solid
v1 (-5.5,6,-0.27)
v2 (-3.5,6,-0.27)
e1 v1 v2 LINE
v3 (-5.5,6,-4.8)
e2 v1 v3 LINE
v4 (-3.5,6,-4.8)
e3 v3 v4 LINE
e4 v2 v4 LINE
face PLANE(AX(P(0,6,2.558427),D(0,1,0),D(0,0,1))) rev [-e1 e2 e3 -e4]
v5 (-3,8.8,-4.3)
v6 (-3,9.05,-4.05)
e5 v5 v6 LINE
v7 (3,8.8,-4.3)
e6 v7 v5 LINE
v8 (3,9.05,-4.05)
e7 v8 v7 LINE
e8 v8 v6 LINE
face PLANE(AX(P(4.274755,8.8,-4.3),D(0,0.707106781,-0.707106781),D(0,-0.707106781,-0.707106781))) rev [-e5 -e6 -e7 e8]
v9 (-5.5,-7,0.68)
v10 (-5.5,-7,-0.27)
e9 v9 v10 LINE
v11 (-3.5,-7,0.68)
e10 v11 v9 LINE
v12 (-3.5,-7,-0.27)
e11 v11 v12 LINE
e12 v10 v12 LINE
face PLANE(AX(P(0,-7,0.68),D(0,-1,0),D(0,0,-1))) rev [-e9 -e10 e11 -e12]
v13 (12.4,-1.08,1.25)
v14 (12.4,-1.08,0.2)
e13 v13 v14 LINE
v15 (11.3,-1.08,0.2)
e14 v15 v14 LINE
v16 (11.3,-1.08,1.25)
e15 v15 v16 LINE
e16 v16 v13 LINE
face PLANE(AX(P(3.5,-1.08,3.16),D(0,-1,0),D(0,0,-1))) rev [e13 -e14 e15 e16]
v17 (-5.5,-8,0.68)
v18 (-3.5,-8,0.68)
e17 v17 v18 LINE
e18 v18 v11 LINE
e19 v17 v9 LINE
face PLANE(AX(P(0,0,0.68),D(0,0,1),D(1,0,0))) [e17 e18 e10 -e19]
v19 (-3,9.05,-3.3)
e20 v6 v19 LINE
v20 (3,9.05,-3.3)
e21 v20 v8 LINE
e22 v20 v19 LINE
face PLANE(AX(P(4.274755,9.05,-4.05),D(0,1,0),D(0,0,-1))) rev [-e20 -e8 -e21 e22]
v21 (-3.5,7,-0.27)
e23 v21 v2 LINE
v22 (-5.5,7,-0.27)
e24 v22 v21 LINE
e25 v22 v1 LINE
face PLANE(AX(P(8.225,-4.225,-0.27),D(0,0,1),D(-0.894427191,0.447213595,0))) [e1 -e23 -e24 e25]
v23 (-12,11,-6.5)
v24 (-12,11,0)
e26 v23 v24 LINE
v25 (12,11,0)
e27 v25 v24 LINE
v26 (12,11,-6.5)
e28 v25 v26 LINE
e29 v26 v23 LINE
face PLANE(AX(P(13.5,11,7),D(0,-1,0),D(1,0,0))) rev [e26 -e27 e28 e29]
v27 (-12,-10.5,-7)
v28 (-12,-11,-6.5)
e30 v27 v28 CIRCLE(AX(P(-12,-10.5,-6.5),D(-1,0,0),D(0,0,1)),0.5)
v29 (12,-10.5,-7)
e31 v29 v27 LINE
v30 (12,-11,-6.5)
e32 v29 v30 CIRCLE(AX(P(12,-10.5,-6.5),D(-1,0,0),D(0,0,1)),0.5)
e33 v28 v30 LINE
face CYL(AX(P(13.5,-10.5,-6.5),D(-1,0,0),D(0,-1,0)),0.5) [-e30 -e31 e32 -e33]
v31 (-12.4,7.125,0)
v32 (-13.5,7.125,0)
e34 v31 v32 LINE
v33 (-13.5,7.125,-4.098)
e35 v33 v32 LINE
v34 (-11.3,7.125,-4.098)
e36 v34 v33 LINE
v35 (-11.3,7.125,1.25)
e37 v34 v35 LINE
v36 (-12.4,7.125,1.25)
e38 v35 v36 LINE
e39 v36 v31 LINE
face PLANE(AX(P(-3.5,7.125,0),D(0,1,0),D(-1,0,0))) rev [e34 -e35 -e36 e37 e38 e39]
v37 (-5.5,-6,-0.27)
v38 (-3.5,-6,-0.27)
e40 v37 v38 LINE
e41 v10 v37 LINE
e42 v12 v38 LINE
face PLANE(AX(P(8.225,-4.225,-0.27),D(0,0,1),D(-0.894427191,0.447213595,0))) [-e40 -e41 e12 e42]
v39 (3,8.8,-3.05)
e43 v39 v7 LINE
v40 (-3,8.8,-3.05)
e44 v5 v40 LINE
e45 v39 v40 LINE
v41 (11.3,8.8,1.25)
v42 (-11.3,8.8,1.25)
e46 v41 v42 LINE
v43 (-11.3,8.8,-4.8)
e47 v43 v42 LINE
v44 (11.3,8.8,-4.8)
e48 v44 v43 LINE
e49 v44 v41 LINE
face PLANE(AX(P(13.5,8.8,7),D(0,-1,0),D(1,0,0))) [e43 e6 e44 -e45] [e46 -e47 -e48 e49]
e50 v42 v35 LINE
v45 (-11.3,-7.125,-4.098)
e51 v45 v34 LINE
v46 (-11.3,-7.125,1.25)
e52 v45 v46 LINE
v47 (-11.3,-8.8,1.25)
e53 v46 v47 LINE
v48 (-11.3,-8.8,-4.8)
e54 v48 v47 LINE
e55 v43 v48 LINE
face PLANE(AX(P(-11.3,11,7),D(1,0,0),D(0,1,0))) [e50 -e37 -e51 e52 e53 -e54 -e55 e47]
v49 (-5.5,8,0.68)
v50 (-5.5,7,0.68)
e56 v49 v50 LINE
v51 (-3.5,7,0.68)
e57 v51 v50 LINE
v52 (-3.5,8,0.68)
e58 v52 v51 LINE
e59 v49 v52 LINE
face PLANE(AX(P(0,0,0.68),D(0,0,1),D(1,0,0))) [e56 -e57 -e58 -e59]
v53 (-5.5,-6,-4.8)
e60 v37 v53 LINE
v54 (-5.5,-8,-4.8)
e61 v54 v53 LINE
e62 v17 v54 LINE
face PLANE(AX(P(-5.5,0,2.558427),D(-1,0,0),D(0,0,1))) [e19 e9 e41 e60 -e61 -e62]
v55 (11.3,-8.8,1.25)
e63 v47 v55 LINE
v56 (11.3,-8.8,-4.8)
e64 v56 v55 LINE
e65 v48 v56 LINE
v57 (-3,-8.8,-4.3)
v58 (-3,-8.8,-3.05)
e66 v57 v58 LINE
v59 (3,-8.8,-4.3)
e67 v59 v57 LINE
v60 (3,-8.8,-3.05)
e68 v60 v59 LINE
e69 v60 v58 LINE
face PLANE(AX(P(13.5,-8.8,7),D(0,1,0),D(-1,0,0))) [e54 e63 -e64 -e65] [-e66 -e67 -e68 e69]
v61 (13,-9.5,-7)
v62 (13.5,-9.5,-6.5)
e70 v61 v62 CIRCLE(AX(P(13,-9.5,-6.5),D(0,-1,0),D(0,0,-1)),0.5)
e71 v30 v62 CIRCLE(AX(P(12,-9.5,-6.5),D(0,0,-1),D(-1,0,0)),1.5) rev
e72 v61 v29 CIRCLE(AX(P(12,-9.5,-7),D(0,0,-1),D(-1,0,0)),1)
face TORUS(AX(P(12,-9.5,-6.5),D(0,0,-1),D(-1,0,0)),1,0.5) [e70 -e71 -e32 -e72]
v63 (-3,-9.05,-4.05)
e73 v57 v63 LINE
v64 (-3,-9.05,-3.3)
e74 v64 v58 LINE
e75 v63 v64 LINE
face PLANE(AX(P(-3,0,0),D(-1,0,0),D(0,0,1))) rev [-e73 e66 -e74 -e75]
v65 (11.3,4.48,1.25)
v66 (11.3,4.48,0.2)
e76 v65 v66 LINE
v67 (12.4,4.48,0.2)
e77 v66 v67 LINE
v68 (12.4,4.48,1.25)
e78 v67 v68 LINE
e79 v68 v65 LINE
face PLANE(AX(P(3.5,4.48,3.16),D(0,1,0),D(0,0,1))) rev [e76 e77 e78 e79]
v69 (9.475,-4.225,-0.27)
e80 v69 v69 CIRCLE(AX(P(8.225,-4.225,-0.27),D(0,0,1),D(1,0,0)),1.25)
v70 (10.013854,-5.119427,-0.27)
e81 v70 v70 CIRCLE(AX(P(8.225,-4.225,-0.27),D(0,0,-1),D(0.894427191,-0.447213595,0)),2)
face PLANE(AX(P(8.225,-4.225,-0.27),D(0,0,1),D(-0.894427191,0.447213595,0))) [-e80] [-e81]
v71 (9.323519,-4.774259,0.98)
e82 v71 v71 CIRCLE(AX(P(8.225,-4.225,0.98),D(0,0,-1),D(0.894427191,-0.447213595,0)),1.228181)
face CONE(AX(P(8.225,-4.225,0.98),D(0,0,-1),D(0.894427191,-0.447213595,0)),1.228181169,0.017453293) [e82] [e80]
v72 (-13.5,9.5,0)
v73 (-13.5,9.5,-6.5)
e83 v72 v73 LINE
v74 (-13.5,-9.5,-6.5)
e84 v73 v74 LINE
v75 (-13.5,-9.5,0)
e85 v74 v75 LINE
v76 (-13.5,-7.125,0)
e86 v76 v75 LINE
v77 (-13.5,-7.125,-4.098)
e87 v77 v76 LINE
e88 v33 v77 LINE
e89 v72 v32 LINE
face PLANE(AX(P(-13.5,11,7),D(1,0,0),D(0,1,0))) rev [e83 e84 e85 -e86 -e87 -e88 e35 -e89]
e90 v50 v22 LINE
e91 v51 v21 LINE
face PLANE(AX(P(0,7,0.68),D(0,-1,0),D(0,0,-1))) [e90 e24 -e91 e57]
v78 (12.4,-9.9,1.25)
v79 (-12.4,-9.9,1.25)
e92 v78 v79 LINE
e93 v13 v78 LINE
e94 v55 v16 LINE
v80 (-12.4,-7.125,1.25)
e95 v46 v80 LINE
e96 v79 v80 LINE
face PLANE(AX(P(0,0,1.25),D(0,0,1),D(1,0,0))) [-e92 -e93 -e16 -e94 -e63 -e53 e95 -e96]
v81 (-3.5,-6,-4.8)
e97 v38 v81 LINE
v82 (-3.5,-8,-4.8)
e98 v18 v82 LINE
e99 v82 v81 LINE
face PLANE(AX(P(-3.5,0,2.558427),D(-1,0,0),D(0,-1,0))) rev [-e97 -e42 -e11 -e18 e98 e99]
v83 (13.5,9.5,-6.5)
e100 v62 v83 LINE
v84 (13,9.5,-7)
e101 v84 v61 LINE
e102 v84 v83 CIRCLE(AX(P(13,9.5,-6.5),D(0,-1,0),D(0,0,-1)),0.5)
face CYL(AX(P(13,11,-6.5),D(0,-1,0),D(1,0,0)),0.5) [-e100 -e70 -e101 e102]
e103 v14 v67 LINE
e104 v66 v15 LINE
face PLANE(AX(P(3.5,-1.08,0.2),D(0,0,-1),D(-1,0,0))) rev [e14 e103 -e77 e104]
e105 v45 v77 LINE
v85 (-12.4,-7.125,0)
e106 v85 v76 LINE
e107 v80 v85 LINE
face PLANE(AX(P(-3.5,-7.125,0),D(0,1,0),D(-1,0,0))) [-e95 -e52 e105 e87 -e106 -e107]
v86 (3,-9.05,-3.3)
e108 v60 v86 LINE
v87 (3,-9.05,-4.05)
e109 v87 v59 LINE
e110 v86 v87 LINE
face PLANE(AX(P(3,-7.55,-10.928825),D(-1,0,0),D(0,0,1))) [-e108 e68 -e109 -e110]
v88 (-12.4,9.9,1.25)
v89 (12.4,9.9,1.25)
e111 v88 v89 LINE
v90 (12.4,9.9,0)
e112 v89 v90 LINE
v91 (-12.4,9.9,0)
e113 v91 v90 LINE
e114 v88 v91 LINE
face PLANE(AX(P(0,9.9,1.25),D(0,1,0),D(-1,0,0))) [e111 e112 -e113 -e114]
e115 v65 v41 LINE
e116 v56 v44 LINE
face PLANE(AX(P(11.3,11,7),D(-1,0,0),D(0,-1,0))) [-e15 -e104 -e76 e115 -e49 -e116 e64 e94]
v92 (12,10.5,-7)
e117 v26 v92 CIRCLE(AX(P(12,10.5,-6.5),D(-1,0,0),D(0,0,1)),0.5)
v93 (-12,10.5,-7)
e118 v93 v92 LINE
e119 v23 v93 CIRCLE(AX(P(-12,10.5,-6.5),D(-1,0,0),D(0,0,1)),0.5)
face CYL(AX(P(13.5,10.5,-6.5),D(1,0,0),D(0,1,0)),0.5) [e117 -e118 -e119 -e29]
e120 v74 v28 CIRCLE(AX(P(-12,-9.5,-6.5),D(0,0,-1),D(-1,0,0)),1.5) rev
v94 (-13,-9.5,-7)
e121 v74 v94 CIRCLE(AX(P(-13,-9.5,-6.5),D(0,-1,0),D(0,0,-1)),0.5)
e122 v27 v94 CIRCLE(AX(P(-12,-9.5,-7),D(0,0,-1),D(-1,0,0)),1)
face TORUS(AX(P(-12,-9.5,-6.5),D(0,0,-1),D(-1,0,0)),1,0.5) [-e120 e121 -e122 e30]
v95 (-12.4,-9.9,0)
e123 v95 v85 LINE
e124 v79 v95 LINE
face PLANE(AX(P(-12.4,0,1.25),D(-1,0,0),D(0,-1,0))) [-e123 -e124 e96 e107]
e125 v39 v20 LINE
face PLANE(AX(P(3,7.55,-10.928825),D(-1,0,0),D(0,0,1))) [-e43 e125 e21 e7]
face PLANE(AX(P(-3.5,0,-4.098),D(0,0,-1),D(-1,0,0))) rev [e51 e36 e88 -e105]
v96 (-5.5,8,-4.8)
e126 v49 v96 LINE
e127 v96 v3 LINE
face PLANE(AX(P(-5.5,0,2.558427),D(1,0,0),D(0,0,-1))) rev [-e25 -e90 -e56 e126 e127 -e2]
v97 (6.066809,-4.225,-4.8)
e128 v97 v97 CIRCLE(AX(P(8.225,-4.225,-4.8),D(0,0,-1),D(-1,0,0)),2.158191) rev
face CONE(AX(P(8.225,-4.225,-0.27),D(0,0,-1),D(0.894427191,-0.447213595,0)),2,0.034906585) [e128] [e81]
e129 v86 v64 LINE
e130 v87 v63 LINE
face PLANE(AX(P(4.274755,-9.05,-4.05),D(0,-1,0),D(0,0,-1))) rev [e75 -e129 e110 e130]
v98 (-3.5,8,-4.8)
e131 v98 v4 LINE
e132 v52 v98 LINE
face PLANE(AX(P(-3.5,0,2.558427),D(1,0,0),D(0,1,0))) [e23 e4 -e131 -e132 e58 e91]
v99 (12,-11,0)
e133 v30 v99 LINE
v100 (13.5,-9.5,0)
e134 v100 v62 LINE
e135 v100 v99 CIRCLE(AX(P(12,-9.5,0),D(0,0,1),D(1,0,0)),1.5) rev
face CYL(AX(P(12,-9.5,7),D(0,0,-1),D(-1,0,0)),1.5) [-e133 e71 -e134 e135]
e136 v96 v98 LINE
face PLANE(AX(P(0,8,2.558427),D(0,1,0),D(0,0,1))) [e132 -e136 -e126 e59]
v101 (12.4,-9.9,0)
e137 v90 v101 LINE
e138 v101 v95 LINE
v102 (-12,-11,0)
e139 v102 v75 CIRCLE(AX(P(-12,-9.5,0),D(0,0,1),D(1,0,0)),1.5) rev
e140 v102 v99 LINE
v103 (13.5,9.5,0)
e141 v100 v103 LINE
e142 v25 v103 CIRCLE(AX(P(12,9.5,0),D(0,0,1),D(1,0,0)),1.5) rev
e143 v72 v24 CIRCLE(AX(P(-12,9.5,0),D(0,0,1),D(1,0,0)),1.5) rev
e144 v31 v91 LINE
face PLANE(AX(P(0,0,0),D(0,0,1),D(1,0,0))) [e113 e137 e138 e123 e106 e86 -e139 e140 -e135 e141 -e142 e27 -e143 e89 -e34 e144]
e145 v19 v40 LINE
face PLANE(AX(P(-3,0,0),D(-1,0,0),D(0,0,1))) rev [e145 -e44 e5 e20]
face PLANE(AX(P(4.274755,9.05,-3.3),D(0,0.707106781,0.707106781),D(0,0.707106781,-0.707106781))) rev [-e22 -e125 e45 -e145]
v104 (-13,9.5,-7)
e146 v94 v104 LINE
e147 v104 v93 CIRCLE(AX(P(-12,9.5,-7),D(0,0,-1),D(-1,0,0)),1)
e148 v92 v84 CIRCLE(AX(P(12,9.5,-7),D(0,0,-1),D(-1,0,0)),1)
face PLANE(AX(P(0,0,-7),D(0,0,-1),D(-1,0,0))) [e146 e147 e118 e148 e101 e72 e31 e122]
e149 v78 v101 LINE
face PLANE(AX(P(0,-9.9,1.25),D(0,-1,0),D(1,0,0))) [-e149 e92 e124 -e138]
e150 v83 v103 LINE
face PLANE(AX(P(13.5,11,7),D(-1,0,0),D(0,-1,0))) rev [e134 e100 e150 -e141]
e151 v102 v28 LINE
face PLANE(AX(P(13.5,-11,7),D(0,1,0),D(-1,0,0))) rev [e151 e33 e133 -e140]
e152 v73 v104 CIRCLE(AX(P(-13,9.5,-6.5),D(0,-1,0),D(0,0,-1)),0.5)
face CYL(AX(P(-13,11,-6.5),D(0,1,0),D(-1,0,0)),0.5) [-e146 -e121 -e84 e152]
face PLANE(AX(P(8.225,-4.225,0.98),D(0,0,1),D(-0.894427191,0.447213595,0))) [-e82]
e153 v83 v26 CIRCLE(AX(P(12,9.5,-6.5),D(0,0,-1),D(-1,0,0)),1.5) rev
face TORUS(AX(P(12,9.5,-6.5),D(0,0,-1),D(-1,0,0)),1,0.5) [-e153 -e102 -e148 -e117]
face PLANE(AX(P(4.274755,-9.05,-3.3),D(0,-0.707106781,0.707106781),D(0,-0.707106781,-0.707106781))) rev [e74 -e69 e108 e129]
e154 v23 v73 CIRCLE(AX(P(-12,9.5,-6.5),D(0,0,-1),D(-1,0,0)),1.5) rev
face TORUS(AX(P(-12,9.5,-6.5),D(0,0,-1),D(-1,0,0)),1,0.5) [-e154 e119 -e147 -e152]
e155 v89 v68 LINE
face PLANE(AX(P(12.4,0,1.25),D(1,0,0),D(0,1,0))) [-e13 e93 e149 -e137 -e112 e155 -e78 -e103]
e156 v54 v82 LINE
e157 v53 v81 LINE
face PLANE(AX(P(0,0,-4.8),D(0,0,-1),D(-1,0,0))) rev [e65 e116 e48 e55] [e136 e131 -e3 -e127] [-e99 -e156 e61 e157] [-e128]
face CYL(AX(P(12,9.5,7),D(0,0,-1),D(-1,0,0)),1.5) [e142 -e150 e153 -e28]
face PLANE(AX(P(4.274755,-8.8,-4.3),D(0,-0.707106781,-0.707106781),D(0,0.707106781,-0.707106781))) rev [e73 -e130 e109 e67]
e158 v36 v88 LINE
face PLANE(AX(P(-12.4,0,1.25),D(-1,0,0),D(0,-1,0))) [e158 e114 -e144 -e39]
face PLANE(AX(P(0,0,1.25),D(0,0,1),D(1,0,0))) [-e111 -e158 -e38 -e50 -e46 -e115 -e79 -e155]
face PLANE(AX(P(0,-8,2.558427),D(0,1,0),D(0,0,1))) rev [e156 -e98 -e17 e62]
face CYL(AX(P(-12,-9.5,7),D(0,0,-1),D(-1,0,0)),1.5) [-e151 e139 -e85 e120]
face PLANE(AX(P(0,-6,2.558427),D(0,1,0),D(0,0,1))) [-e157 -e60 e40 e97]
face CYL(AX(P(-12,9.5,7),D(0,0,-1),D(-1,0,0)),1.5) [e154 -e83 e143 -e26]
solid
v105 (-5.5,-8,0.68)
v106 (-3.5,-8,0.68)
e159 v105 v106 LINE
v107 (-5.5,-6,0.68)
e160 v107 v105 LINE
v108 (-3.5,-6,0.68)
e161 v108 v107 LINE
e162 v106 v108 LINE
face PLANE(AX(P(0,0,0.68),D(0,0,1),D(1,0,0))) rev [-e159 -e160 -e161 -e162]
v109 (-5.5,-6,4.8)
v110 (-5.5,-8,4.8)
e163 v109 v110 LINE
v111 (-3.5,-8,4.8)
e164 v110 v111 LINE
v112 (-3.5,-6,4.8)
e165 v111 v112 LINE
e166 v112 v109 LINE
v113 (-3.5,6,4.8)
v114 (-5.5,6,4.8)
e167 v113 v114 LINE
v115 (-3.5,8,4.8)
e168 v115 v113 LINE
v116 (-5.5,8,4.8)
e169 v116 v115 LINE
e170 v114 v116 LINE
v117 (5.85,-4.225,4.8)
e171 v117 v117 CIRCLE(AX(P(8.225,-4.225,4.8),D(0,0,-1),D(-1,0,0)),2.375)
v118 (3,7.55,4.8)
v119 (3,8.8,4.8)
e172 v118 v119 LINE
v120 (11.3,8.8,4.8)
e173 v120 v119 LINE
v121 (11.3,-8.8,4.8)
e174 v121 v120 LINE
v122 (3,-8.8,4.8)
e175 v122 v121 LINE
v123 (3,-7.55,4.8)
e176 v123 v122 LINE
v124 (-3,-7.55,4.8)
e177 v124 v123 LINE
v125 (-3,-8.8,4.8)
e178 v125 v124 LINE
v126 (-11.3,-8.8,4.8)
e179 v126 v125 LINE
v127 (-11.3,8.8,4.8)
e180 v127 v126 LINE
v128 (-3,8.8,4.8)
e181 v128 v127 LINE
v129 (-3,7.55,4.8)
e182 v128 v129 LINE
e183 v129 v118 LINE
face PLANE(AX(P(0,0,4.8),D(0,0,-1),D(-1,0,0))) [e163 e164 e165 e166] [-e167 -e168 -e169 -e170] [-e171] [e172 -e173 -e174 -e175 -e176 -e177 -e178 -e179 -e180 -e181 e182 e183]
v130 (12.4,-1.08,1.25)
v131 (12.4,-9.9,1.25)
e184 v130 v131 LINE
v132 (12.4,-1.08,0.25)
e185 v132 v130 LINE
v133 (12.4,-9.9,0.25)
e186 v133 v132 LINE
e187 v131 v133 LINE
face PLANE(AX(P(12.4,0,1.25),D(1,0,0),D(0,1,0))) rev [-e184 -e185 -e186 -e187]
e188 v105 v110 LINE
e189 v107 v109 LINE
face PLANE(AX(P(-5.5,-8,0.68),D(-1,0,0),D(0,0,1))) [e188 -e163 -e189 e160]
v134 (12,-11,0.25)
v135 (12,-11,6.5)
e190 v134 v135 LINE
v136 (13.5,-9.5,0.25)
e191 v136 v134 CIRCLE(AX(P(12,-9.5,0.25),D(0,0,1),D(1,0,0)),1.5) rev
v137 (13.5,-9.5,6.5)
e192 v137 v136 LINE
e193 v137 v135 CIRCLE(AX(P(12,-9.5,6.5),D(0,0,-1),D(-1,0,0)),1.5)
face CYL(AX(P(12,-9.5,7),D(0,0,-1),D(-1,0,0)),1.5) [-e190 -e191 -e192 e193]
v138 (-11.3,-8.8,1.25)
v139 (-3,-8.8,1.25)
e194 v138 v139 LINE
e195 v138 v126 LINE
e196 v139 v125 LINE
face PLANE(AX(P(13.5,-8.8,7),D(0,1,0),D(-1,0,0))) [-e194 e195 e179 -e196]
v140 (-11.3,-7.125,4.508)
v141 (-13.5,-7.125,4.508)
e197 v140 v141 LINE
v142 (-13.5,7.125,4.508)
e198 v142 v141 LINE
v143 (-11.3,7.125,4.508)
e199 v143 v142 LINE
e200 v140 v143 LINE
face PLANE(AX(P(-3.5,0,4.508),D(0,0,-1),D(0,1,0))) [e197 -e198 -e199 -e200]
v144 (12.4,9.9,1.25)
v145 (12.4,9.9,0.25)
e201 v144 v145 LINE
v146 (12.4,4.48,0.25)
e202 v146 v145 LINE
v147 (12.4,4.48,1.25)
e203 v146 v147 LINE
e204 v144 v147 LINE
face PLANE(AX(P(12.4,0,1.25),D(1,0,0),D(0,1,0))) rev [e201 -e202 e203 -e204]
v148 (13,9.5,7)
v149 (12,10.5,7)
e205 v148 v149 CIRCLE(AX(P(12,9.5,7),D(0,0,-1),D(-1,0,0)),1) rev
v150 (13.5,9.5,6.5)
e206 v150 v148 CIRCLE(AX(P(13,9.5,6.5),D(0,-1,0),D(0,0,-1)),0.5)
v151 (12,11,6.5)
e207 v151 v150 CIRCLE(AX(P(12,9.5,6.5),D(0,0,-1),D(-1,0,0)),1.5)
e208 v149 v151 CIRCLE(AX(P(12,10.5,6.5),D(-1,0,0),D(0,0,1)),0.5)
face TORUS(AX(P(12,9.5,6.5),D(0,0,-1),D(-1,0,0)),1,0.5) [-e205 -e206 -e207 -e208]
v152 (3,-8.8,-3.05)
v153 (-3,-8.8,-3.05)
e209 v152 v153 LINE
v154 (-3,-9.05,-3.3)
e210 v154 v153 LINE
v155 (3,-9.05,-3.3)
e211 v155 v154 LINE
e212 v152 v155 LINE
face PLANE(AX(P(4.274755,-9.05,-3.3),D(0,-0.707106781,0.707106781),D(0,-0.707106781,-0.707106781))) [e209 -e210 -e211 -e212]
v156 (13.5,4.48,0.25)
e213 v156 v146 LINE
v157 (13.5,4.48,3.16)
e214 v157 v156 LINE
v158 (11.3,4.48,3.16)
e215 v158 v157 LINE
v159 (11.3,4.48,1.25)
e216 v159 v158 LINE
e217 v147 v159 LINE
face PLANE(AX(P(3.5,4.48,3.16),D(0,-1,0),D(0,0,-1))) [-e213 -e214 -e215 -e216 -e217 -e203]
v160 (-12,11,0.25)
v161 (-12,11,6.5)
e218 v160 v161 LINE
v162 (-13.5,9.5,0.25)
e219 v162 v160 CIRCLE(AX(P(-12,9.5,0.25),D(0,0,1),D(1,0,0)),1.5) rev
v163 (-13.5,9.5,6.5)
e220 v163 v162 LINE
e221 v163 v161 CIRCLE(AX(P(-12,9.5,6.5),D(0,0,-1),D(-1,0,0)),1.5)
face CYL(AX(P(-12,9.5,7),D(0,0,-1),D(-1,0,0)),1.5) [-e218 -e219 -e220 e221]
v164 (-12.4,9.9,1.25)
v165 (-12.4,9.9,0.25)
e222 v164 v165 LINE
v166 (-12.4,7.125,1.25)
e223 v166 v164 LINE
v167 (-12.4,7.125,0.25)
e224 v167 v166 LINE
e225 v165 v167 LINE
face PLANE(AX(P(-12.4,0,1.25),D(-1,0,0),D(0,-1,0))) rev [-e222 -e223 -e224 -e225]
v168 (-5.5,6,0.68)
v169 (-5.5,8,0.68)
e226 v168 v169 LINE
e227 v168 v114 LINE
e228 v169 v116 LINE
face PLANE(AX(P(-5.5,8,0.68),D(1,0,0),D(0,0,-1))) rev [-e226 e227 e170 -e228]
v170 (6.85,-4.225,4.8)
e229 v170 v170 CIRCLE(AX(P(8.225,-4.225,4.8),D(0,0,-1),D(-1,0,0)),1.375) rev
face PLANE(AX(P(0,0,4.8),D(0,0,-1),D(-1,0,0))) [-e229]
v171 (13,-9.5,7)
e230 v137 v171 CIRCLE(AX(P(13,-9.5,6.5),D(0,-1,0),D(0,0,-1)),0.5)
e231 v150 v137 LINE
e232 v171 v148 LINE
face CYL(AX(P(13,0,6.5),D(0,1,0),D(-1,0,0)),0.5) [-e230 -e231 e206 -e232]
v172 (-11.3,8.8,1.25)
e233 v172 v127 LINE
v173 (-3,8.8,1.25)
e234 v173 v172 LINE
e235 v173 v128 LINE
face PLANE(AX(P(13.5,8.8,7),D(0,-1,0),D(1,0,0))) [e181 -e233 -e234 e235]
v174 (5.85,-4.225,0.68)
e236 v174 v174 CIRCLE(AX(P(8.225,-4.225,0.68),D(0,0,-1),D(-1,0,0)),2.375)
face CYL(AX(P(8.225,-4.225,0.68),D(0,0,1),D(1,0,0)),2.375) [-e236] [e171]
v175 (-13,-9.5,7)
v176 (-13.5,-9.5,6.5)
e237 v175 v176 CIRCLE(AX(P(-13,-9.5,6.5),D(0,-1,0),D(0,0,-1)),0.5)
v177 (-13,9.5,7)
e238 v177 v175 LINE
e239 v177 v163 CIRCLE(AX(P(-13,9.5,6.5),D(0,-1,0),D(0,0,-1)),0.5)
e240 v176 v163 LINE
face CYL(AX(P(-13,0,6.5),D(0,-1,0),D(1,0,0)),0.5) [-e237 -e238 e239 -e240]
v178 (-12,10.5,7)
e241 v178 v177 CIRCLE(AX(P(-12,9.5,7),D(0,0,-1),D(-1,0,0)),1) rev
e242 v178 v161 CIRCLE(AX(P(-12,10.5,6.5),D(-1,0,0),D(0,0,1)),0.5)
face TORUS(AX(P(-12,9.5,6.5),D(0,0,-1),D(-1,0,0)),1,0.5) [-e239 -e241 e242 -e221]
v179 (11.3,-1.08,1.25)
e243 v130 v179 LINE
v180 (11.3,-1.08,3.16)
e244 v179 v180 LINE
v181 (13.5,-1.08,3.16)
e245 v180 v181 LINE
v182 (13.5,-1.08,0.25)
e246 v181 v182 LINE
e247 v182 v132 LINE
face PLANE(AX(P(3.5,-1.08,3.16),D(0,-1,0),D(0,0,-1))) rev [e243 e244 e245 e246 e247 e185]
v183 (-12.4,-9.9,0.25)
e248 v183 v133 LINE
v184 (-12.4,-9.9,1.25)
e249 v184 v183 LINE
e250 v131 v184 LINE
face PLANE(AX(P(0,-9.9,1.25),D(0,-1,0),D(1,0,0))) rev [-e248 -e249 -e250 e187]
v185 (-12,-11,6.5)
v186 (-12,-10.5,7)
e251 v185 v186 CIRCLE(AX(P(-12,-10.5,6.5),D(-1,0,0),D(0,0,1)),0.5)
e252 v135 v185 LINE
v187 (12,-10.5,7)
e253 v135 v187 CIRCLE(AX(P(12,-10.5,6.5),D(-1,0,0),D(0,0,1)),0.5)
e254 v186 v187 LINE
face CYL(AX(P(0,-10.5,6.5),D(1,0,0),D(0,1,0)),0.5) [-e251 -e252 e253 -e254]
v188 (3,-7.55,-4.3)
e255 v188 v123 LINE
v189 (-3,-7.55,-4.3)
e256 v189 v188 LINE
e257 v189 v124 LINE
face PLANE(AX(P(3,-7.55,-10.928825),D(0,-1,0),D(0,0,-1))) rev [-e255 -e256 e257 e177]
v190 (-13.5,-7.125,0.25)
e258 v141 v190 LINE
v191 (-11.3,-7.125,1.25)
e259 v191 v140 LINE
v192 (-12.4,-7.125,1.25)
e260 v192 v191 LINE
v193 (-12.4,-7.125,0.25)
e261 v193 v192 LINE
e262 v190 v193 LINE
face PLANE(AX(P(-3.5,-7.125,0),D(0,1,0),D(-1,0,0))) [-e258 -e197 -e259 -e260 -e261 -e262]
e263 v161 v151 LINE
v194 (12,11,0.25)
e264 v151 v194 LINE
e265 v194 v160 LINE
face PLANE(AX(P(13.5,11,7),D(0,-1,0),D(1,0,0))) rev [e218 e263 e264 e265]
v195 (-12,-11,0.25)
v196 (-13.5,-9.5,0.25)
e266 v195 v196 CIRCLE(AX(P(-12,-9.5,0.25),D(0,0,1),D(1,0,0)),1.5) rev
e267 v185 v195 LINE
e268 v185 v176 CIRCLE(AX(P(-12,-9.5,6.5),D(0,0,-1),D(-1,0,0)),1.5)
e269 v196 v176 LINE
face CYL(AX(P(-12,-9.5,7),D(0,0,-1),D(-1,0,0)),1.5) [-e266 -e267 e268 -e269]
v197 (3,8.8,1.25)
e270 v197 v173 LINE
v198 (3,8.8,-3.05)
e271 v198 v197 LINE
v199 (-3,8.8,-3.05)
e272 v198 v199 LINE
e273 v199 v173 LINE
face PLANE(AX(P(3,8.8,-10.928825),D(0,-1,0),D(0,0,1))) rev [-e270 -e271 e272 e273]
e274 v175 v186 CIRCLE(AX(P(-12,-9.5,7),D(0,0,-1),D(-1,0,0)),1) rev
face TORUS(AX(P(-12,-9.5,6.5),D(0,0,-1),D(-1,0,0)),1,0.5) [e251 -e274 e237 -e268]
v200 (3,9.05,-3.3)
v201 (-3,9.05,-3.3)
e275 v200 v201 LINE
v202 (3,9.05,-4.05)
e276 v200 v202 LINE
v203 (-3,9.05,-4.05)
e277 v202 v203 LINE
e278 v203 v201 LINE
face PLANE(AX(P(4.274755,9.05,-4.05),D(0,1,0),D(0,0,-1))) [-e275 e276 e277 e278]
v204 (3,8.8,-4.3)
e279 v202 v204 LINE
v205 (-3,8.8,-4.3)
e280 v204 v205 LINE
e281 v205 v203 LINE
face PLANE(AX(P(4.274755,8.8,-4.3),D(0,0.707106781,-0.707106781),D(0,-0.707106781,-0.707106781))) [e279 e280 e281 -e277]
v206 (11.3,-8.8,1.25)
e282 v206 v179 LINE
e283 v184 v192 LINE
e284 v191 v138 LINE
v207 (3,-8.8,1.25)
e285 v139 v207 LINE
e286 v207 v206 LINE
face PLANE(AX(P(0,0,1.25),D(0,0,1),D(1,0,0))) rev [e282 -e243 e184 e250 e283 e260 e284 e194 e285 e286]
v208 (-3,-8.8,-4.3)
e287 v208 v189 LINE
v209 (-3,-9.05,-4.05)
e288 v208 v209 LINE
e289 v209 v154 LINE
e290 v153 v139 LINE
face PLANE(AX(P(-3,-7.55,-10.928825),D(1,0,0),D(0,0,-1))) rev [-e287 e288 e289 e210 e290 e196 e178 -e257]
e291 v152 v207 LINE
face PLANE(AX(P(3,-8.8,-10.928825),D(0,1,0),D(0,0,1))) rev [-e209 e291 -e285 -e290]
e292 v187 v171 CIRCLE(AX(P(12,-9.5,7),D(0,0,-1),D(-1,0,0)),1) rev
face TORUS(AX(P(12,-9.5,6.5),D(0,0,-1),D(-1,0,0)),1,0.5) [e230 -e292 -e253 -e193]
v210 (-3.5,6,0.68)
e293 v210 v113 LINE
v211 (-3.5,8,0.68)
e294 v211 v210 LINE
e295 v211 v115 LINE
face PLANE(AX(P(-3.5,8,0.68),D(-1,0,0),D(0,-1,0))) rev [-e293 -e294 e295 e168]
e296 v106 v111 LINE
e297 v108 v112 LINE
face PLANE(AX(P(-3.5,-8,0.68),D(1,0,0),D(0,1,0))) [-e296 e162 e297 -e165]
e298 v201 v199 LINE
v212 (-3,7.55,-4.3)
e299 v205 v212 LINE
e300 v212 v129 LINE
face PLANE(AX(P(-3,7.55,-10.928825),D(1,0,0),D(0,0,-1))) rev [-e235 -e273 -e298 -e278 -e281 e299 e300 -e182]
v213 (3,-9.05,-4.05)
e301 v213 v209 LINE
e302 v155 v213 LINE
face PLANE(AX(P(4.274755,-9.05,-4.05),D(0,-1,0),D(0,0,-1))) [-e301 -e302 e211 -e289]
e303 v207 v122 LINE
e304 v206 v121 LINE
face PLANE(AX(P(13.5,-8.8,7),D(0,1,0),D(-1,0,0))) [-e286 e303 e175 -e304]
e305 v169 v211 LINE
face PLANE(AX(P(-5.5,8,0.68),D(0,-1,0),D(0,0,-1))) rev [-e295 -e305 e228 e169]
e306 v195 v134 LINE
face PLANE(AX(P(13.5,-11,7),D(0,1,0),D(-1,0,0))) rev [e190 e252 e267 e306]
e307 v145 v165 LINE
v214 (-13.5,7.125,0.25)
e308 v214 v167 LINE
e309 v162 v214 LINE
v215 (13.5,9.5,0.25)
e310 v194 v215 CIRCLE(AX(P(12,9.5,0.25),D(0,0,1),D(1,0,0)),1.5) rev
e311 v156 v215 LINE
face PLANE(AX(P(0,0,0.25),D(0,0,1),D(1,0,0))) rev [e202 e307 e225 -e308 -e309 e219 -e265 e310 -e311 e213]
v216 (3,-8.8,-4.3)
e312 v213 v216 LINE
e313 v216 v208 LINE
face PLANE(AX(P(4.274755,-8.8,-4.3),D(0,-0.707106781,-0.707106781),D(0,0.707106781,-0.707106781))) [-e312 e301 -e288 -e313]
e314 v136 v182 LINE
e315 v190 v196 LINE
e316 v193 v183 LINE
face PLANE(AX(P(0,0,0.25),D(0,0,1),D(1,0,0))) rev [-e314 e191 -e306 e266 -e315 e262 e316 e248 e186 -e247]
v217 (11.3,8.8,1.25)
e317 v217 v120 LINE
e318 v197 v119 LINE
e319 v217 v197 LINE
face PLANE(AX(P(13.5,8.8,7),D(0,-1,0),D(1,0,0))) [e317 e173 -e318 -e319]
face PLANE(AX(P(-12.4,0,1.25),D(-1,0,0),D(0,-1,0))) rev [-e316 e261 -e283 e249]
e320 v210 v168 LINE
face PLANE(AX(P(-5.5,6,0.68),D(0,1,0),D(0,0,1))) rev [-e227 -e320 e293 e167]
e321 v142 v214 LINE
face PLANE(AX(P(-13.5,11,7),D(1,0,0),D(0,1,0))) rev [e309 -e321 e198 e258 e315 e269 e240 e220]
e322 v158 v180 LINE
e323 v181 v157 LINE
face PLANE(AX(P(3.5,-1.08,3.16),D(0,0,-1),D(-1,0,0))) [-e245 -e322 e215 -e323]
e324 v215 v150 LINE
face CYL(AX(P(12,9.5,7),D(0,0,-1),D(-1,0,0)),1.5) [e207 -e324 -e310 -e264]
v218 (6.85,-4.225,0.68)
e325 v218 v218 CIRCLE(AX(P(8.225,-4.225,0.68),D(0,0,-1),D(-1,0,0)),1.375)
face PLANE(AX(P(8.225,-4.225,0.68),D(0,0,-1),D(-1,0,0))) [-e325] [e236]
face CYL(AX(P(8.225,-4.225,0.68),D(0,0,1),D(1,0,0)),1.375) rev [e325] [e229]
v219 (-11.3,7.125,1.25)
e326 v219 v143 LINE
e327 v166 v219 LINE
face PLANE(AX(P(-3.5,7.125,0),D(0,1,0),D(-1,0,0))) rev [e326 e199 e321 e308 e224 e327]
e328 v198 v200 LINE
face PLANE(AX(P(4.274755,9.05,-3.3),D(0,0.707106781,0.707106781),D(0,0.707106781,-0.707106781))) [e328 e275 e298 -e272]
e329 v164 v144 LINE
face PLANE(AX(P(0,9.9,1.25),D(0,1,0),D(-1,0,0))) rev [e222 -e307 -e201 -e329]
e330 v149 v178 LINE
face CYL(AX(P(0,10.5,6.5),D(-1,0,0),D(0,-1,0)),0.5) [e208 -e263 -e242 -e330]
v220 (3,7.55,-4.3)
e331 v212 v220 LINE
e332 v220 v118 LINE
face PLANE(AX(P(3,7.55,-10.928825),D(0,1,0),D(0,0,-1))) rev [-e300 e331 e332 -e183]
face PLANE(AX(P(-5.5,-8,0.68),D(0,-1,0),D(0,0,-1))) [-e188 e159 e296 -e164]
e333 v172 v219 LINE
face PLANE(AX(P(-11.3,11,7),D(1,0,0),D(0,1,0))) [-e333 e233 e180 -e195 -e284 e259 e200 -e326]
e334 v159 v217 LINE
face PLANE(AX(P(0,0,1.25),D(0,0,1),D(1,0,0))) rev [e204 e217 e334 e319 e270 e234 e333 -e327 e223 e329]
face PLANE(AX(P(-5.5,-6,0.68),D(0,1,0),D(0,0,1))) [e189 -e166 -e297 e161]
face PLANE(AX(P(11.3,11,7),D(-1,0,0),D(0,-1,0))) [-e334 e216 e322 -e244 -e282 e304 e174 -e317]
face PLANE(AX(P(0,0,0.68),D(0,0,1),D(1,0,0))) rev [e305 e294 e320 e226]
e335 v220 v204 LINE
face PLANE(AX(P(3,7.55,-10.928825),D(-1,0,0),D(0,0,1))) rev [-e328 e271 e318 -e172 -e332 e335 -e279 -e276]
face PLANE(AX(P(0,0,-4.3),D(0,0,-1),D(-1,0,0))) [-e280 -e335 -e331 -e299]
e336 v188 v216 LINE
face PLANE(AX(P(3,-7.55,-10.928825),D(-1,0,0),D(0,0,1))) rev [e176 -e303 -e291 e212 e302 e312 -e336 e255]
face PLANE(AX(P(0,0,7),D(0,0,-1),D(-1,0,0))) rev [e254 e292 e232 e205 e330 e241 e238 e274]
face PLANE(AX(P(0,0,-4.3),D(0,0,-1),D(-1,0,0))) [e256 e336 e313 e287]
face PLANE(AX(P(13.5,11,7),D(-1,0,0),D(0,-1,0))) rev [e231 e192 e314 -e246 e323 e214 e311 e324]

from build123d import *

# Parameters (mm, degrees)
SKETCH1_W                   = 27
SKETCH1_H                   = 22
BOSS_EXTRUDE1_DEPTH         = 7
FILLET1_R                   = 1.5
SHELL1_T                    = 2.2
SKETCH4_W                   = 8.606
SKETCH4_H                   = 14.25
CUT_EXTRUDE1_DEPTH          = 10
SKETCH3_W                   = 2.96
SKETCH3_H                   = 5.56
CUT_EXTRUDE2_DEPTH          = 10
FILLET2_R                   = 0.5
FILLET3_R                   = 0.5
SKETCH5_W                   = 2
SKETCH5_H                   = 1
BOSS_EXTRUDE2_DEPTH         = 4.53
SKETCH5_3_W                 = 2
SKETCH5_3_H                 = 1
BOSS_EXTRUDE3_DEPTH         = 5.48
SKETCH6_W                   = 2
SKETCH6_H                   = 2
BOSS_EXTRUDE4_DEPTH         = 4.12
LIP_GROOVE2_GROOVE_DEPTH    = 1.25
LIP_GROOVE2_GROOVE_2_DEPTH  = 0.25
LIP_GROOVE2_LIP_START       = -12.4
LIP_GROOVE2_LIP_OUTLINE_W   = 1.1
LIP_GROOVE2_LIP_OUTLINE_H   = 1.25
LIP_GROOVE2_LIP_DEPTH       = 24.8
LIP_GROOVE2_LIP_START_2     = 11.3
LIP_GROOVE2_LIP_2_OUTLINE_W = 17.6
LIP_GROOVE2_LIP_2_OUTLINE_H = 1.25
LIP_GROOVE2_LIP_2_DEPTH     = 1.1
LIP_GROOVE2_LIP_3_OUTLINE_W = 1.675
LIP_GROOVE2_LIP_3_OUTLINE_H = 1.25
LIP_GROOVE2_LIP_3_DEPTH     = 1.1
SKETCH11_W                  = 6
SKETCH11_H                  = 1.25
BOSS_EXTRUDE5_DEPTH         = 9.1
BOSS_EXTRUDE6_DEPTH         = 6
CUT_EXTRUDE3_START          = -3
CUT_EXTRUDE3_DEPTH          = 6
SKETCH3_3_W                 = 2.96
SKETCH3_3_H                 = 5.56
CUT_EXTRUDE4_DEPTH          = 10
SKETCH14_R                  = 2.375
SKETCH14_R_2                = 1.375
BOSS_EXTRUDE7_DEPTH         = 4.12


# Read off the part's stored shape, not the designer's step: Mounting Boss1, Lip&Groove2-Groove, Lip&Groove2-Lip, Cut-Extrude3
with BuildPart() as part:
    # Sketch1 → Boss-Extrude1 (new, symmetric)
    with BuildSketch(Plane.XY):
        Rectangle(SKETCH1_W, SKETCH1_H)
    extrude(amount=BOSS_EXTRUDE1_DEPTH, both=True)

    # Fillet1
    fillet1_edges = [part.edges().sort_by_distance(p)[0] for p in [
        (-13.5, 11, 0),
        (13.5, 11, 0),
        (13.5, -11, 0),
        (-13.5, -11, 0),
    ]]
    fillet(fillet1_edges, radius=FILLET1_R)

    # Shell1 (no face opened: a closed hollow body)
    add(offset(amount=-SHELL1_T, mode=Mode.PRIVATE), mode=Mode.SUBTRACT)


with BuildPart() as body_2:
    # Split1: the piece on the far side of the plane
    add(part.part)
    split(bisect_by=Plane.XY, keep=Keep.BOTTOM)

    # Mounting Boss1 outline → Mounting Boss1 (revolve)
    with BuildSketch(Plane(origin=(8.225, -4.225, 0), x_dir=(1, 0, 0), z_dir=(0, -1, 0))):
        Polygon((2, -0.27), (1.25, -0.27), (1.228181169, 0.98), (0, 0.98), (0, -4.8), (2.158191086, -4.8), align=None)
    revolve(axis=Axis((8.225, -4.225, 0), (0, 0, 1)))


with BuildPart() as part_1:
    add(part.part)

    # Split1
    split(bisect_by=Plane.XY, keep=Keep.TOP)


with BuildPart() as cut_extrude1_tool:
    # Sketch4 → Cut-Extrude1 (new body)
    with BuildSketch(Plane.ZY.offset(13.5)):
        with Locations((0.205, 0)):
            Rectangle(SKETCH4_W, SKETCH4_H)
    extrude(amount=-CUT_EXTRUDE1_DEPTH)


with BuildPart() as part_2:
    add(part_1.part)

    # Cut-Extrude1: cut by cut_extrude1_tool
    add(cut_extrude1_tool.part, mode=Mode.SUBTRACT)

    # Sketch3 → Cut-Extrude2 (cut)
    with BuildSketch(Plane(origin=(13.5, 0, 0), x_dir=(0, 0, -1), z_dir=(1, 0, 0))):
        with Locations((-1.68, 1.7)):
            Rectangle(SKETCH3_W, SKETCH3_H)
    extrude(amount=-CUT_EXTRUDE2_DEPTH, mode=Mode.SUBTRACT)

    # Fillet2
    fillet2_edges = [part_2.edges().sort_by_distance(p)[0] for p in [
        (-13.5, 0, 7),
        (0, 11, 7),
        (0, -11, 7),
        (13.5, 0, 7),
        (-13.060660172, -10.560660172, 7),
        (13.060660172, -10.560660172, 7),
        (13.060660172, 10.560660172, 7),
        (-13.060660172, 10.560660172, 7),
    ]]
    fillet(fillet2_edges, radius=FILLET2_R)

    # Sketch6 → Boss-Extrude4 (add)
    with BuildSketch(Plane(origin=(0, 0, 4.8), x_dir=(-1, 0, 0), z_dir=(0, 0, -1))):
        with Locations((4.5, 7)):
            Rectangle(SKETCH6_W, SKETCH6_H)
    boss_extrude4 = extrude(amount=BOSS_EXTRUDE4_DEPTH)

    # Mirror3: Boss-Extrude4 across plane
    add(boss_extrude4.mirror(Plane.ZX))

    # Lip&Groove2-Groove outline → Lip&Groove2-Groove (cut)
    with BuildSketch(Plane.XY):
        Polygon((-12.4, -9.9), (12.4, -9.9), (12.4, -1.08), (13.5, -1.08), (13.5, 4.48), (12.4, 4.48), (12.4, 9.9), (-12.4, 9.9), (-12.4, 7.125), (-11.3, 7.125), (-11.3, 8.8), (11.3, 8.8), (11.3, -8.8), (-11.3, -8.8), (-11.3, -7.125), (-12.4, -7.125), align=None)
    extrude(amount=LIP_GROOVE2_GROOVE_DEPTH, mode=Mode.SUBTRACT)

    # Lip_Groove2-Groove 2 outline → Lip_Groove2-Groove 2 (cut)
    with BuildSketch(Plane.XY):
        with BuildLine():
            Line((12.4, -1.08), (12.4, -9.9))
            Line((12.4, -9.9), (-12.4, -9.9))
            Line((-12.4, -9.9), (-12.4, -7.125))
            Line((-12.4, -7.125), (-13.5, -7.125))
            Line((-13.5, -7.125), (-13.5, -9.5))
            ThreePointArc((-13.5, -9.5), (-13.060660172, -10.560660172), (-12, -11))
            Line((-12, -11), (12, -11))
            ThreePointArc((12, -11), (13.060660172, -10.560660172), (13.5, -9.5))
            Line((13.5, -9.5), (13.5, -1.08))
            Line((13.5, -1.08), (12.4, -1.08))
        make_face()
        with BuildLine():
            Line((12.4, 4.48), (13.5, 4.48))
            Line((13.5, 4.48), (13.5, 9.5))
            ThreePointArc((13.5, 9.5), (13.060660172, 10.560660172), (12, 11))
            Line((12, 11), (-12, 11))
            ThreePointArc((-12, 11), (-13.060660172, 10.560660172), (-13.5, 9.5))
            Line((-13.5, 9.5), (-13.5, 7.125))
            Line((-13.5, 7.125), (-12.4, 7.125))
            Line((-12.4, 7.125), (-12.4, 9.9))
            Line((-12.4, 9.9), (12.4, 9.9))
            Line((12.4, 9.9), (12.4, 4.48))
        make_face()
    extrude(amount=LIP_GROOVE2_GROOVE_2_DEPTH, mode=Mode.SUBTRACT)

    # Sketch11 → Boss-Extrude5 (add)
    with BuildSketch(Plane(origin=(0, 0, 4.8), x_dir=(-1, 0, 0), z_dir=(0, 0, -1))):
        with Locations((0, -8.175)):
            Rectangle(SKETCH11_W, SKETCH11_H)
    boss_extrude5 = extrude(amount=BOSS_EXTRUDE5_DEPTH)

    # Sketch12 → Boss-Extrude6 (add)
    with BuildSketch(Plane.ZY.offset(3)):
        Polygon((-4.3, -8.8), (-4.05, -9.05), (-3.3, -9.05), (-3.05, -8.8), align=None)
    boss_extrude6 = extrude(amount=-BOSS_EXTRUDE6_DEPTH)

    # Mirror5: Boss-Extrude5, Boss-Extrude6 across plane
    add(boss_extrude5.mirror(Plane.ZX))
    add(boss_extrude6.mirror(Plane.ZX))

    # Sketch14 → Boss-Extrude7 (add)
    with BuildSketch(Plane(origin=(0, 0, 4.8), x_dir=(-1, 0, 0), z_dir=(0, 0, -1))):
        with Locations((-8.225, -4.225)):
            Circle(SKETCH14_R)
        with Locations((-8.225, -4.225)):
            Circle(SKETCH14_R_2, mode=Mode.SUBTRACT)
    extrude(amount=BOSS_EXTRUDE7_DEPTH)


with BuildPart() as body_2_1:
    add(body_2.part)

    # Cut-Extrude1: cut by cut_extrude1_tool
    add(cut_extrude1_tool.part, mode=Mode.SUBTRACT)

    # Fillet3
    fillet3_edges = [body_2_1.edges().sort_by_distance(p)[0] for p in [
        (-13.5, 0, -7),
        (0, -11, -7),
        (13.5, 0, -7),
        (0, 11, -7),
        (-13.060660172, -10.560660172, -7),
        (13.060660172, -10.560660172, -7),
        (13.060660172, 10.560660172, -7),
        (-13.060660172, 10.560660172, -7),
    ]]
    fillet(fillet3_edges, radius=FILLET3_R)

    # Sketch5 → Boss-Extrude2 (add)
    with BuildSketch(Plane.XY.offset(-4.8)):
        with Locations((-4.5, 7.5)):
            Rectangle(SKETCH5_W, SKETCH5_H)
        with Locations((-4.5, 6.5)):
            Rectangle(SKETCH5_W, SKETCH5_H)
    boss_extrude2 = extrude(amount=BOSS_EXTRUDE2_DEPTH)

    # Sketch5<3> → Boss-Extrude3 (add)
    with BuildSketch(Plane.XY.offset(-4.8)):
        with Locations((-4.5, 7.5)):
            Rectangle(SKETCH5_3_W, SKETCH5_3_H)
    boss_extrude3 = extrude(amount=BOSS_EXTRUDE3_DEPTH)

    # Mirror2: Boss-Extrude2, Boss-Extrude3 across plane
    add(boss_extrude2.mirror(Plane.ZX))
    add(boss_extrude3.mirror(Plane.ZX))

    # Lip&Groove2-Lip outline → Lip&Groove2-Lip (add)
    with BuildSketch(Plane.YZ.offset(LIP_GROOVE2_LIP_START)):
        with Locations((-9.35, 0.625)):
            Rectangle(LIP_GROOVE2_LIP_OUTLINE_W, LIP_GROOVE2_LIP_OUTLINE_H)
        with Locations((9.35, 0.625)):
            Rectangle(LIP_GROOVE2_LIP_OUTLINE_W, LIP_GROOVE2_LIP_OUTLINE_H)
    extrude(amount=LIP_GROOVE2_LIP_DEPTH)

    # Lip_Groove2-Lip 2 outline → Lip_Groove2-Lip 2 (add)
    with BuildSketch(Plane.YZ.offset(LIP_GROOVE2_LIP_START_2)):
        with Locations((0, 0.625)):
            Rectangle(LIP_GROOVE2_LIP_2_OUTLINE_W, LIP_GROOVE2_LIP_2_OUTLINE_H)
    extrude(amount=LIP_GROOVE2_LIP_2_DEPTH)

    # Lip_Groove2-Lip 3 outline → Lip_Groove2-Lip 3 (add)
    with BuildSketch(Plane.YZ.offset(LIP_GROOVE2_LIP_START)):
        with Locations((-7.9625, 0.625)):
            Rectangle(LIP_GROOVE2_LIP_3_OUTLINE_W, LIP_GROOVE2_LIP_3_OUTLINE_H)
        with Locations((7.9625, 0.625)):
            Rectangle(LIP_GROOVE2_LIP_3_OUTLINE_W, LIP_GROOVE2_LIP_3_OUTLINE_H)
    extrude(amount=LIP_GROOVE2_LIP_3_DEPTH)

    # Cut-Extrude3 outline → Cut-Extrude3 (cut)
    with BuildSketch(Plane.YZ.offset(CUT_EXTRUDE3_START)):
        Polygon((-9.05, -3.3), (-9.05, -4.05), (-8.8, -4.3), (-8.8, -3.05), align=None)
    cut_extrude3 = extrude(amount=CUT_EXTRUDE3_DEPTH, mode=Mode.SUBTRACT)

    # Mirror6: Cut-Extrude3 across plane
    add(cut_extrude3.mirror(Plane.ZX), mode=Mode.SUBTRACT)

    # Sketch3<3> → Cut-Extrude4 (cut)
    with BuildSketch(Plane(origin=(13.5, 0, 0), x_dir=(0, 0, -1), z_dir=(1, 0, 0))):
        with Locations((-1.68, 1.7)):
            Rectangle(SKETCH3_3_W, SKETCH3_3_H)
    extrude(amount=-CUT_EXTRUDE4_DEPTH, mode=Mode.SUBTRACT)


solid = Compound([part_2.part, body_2_1.part])
